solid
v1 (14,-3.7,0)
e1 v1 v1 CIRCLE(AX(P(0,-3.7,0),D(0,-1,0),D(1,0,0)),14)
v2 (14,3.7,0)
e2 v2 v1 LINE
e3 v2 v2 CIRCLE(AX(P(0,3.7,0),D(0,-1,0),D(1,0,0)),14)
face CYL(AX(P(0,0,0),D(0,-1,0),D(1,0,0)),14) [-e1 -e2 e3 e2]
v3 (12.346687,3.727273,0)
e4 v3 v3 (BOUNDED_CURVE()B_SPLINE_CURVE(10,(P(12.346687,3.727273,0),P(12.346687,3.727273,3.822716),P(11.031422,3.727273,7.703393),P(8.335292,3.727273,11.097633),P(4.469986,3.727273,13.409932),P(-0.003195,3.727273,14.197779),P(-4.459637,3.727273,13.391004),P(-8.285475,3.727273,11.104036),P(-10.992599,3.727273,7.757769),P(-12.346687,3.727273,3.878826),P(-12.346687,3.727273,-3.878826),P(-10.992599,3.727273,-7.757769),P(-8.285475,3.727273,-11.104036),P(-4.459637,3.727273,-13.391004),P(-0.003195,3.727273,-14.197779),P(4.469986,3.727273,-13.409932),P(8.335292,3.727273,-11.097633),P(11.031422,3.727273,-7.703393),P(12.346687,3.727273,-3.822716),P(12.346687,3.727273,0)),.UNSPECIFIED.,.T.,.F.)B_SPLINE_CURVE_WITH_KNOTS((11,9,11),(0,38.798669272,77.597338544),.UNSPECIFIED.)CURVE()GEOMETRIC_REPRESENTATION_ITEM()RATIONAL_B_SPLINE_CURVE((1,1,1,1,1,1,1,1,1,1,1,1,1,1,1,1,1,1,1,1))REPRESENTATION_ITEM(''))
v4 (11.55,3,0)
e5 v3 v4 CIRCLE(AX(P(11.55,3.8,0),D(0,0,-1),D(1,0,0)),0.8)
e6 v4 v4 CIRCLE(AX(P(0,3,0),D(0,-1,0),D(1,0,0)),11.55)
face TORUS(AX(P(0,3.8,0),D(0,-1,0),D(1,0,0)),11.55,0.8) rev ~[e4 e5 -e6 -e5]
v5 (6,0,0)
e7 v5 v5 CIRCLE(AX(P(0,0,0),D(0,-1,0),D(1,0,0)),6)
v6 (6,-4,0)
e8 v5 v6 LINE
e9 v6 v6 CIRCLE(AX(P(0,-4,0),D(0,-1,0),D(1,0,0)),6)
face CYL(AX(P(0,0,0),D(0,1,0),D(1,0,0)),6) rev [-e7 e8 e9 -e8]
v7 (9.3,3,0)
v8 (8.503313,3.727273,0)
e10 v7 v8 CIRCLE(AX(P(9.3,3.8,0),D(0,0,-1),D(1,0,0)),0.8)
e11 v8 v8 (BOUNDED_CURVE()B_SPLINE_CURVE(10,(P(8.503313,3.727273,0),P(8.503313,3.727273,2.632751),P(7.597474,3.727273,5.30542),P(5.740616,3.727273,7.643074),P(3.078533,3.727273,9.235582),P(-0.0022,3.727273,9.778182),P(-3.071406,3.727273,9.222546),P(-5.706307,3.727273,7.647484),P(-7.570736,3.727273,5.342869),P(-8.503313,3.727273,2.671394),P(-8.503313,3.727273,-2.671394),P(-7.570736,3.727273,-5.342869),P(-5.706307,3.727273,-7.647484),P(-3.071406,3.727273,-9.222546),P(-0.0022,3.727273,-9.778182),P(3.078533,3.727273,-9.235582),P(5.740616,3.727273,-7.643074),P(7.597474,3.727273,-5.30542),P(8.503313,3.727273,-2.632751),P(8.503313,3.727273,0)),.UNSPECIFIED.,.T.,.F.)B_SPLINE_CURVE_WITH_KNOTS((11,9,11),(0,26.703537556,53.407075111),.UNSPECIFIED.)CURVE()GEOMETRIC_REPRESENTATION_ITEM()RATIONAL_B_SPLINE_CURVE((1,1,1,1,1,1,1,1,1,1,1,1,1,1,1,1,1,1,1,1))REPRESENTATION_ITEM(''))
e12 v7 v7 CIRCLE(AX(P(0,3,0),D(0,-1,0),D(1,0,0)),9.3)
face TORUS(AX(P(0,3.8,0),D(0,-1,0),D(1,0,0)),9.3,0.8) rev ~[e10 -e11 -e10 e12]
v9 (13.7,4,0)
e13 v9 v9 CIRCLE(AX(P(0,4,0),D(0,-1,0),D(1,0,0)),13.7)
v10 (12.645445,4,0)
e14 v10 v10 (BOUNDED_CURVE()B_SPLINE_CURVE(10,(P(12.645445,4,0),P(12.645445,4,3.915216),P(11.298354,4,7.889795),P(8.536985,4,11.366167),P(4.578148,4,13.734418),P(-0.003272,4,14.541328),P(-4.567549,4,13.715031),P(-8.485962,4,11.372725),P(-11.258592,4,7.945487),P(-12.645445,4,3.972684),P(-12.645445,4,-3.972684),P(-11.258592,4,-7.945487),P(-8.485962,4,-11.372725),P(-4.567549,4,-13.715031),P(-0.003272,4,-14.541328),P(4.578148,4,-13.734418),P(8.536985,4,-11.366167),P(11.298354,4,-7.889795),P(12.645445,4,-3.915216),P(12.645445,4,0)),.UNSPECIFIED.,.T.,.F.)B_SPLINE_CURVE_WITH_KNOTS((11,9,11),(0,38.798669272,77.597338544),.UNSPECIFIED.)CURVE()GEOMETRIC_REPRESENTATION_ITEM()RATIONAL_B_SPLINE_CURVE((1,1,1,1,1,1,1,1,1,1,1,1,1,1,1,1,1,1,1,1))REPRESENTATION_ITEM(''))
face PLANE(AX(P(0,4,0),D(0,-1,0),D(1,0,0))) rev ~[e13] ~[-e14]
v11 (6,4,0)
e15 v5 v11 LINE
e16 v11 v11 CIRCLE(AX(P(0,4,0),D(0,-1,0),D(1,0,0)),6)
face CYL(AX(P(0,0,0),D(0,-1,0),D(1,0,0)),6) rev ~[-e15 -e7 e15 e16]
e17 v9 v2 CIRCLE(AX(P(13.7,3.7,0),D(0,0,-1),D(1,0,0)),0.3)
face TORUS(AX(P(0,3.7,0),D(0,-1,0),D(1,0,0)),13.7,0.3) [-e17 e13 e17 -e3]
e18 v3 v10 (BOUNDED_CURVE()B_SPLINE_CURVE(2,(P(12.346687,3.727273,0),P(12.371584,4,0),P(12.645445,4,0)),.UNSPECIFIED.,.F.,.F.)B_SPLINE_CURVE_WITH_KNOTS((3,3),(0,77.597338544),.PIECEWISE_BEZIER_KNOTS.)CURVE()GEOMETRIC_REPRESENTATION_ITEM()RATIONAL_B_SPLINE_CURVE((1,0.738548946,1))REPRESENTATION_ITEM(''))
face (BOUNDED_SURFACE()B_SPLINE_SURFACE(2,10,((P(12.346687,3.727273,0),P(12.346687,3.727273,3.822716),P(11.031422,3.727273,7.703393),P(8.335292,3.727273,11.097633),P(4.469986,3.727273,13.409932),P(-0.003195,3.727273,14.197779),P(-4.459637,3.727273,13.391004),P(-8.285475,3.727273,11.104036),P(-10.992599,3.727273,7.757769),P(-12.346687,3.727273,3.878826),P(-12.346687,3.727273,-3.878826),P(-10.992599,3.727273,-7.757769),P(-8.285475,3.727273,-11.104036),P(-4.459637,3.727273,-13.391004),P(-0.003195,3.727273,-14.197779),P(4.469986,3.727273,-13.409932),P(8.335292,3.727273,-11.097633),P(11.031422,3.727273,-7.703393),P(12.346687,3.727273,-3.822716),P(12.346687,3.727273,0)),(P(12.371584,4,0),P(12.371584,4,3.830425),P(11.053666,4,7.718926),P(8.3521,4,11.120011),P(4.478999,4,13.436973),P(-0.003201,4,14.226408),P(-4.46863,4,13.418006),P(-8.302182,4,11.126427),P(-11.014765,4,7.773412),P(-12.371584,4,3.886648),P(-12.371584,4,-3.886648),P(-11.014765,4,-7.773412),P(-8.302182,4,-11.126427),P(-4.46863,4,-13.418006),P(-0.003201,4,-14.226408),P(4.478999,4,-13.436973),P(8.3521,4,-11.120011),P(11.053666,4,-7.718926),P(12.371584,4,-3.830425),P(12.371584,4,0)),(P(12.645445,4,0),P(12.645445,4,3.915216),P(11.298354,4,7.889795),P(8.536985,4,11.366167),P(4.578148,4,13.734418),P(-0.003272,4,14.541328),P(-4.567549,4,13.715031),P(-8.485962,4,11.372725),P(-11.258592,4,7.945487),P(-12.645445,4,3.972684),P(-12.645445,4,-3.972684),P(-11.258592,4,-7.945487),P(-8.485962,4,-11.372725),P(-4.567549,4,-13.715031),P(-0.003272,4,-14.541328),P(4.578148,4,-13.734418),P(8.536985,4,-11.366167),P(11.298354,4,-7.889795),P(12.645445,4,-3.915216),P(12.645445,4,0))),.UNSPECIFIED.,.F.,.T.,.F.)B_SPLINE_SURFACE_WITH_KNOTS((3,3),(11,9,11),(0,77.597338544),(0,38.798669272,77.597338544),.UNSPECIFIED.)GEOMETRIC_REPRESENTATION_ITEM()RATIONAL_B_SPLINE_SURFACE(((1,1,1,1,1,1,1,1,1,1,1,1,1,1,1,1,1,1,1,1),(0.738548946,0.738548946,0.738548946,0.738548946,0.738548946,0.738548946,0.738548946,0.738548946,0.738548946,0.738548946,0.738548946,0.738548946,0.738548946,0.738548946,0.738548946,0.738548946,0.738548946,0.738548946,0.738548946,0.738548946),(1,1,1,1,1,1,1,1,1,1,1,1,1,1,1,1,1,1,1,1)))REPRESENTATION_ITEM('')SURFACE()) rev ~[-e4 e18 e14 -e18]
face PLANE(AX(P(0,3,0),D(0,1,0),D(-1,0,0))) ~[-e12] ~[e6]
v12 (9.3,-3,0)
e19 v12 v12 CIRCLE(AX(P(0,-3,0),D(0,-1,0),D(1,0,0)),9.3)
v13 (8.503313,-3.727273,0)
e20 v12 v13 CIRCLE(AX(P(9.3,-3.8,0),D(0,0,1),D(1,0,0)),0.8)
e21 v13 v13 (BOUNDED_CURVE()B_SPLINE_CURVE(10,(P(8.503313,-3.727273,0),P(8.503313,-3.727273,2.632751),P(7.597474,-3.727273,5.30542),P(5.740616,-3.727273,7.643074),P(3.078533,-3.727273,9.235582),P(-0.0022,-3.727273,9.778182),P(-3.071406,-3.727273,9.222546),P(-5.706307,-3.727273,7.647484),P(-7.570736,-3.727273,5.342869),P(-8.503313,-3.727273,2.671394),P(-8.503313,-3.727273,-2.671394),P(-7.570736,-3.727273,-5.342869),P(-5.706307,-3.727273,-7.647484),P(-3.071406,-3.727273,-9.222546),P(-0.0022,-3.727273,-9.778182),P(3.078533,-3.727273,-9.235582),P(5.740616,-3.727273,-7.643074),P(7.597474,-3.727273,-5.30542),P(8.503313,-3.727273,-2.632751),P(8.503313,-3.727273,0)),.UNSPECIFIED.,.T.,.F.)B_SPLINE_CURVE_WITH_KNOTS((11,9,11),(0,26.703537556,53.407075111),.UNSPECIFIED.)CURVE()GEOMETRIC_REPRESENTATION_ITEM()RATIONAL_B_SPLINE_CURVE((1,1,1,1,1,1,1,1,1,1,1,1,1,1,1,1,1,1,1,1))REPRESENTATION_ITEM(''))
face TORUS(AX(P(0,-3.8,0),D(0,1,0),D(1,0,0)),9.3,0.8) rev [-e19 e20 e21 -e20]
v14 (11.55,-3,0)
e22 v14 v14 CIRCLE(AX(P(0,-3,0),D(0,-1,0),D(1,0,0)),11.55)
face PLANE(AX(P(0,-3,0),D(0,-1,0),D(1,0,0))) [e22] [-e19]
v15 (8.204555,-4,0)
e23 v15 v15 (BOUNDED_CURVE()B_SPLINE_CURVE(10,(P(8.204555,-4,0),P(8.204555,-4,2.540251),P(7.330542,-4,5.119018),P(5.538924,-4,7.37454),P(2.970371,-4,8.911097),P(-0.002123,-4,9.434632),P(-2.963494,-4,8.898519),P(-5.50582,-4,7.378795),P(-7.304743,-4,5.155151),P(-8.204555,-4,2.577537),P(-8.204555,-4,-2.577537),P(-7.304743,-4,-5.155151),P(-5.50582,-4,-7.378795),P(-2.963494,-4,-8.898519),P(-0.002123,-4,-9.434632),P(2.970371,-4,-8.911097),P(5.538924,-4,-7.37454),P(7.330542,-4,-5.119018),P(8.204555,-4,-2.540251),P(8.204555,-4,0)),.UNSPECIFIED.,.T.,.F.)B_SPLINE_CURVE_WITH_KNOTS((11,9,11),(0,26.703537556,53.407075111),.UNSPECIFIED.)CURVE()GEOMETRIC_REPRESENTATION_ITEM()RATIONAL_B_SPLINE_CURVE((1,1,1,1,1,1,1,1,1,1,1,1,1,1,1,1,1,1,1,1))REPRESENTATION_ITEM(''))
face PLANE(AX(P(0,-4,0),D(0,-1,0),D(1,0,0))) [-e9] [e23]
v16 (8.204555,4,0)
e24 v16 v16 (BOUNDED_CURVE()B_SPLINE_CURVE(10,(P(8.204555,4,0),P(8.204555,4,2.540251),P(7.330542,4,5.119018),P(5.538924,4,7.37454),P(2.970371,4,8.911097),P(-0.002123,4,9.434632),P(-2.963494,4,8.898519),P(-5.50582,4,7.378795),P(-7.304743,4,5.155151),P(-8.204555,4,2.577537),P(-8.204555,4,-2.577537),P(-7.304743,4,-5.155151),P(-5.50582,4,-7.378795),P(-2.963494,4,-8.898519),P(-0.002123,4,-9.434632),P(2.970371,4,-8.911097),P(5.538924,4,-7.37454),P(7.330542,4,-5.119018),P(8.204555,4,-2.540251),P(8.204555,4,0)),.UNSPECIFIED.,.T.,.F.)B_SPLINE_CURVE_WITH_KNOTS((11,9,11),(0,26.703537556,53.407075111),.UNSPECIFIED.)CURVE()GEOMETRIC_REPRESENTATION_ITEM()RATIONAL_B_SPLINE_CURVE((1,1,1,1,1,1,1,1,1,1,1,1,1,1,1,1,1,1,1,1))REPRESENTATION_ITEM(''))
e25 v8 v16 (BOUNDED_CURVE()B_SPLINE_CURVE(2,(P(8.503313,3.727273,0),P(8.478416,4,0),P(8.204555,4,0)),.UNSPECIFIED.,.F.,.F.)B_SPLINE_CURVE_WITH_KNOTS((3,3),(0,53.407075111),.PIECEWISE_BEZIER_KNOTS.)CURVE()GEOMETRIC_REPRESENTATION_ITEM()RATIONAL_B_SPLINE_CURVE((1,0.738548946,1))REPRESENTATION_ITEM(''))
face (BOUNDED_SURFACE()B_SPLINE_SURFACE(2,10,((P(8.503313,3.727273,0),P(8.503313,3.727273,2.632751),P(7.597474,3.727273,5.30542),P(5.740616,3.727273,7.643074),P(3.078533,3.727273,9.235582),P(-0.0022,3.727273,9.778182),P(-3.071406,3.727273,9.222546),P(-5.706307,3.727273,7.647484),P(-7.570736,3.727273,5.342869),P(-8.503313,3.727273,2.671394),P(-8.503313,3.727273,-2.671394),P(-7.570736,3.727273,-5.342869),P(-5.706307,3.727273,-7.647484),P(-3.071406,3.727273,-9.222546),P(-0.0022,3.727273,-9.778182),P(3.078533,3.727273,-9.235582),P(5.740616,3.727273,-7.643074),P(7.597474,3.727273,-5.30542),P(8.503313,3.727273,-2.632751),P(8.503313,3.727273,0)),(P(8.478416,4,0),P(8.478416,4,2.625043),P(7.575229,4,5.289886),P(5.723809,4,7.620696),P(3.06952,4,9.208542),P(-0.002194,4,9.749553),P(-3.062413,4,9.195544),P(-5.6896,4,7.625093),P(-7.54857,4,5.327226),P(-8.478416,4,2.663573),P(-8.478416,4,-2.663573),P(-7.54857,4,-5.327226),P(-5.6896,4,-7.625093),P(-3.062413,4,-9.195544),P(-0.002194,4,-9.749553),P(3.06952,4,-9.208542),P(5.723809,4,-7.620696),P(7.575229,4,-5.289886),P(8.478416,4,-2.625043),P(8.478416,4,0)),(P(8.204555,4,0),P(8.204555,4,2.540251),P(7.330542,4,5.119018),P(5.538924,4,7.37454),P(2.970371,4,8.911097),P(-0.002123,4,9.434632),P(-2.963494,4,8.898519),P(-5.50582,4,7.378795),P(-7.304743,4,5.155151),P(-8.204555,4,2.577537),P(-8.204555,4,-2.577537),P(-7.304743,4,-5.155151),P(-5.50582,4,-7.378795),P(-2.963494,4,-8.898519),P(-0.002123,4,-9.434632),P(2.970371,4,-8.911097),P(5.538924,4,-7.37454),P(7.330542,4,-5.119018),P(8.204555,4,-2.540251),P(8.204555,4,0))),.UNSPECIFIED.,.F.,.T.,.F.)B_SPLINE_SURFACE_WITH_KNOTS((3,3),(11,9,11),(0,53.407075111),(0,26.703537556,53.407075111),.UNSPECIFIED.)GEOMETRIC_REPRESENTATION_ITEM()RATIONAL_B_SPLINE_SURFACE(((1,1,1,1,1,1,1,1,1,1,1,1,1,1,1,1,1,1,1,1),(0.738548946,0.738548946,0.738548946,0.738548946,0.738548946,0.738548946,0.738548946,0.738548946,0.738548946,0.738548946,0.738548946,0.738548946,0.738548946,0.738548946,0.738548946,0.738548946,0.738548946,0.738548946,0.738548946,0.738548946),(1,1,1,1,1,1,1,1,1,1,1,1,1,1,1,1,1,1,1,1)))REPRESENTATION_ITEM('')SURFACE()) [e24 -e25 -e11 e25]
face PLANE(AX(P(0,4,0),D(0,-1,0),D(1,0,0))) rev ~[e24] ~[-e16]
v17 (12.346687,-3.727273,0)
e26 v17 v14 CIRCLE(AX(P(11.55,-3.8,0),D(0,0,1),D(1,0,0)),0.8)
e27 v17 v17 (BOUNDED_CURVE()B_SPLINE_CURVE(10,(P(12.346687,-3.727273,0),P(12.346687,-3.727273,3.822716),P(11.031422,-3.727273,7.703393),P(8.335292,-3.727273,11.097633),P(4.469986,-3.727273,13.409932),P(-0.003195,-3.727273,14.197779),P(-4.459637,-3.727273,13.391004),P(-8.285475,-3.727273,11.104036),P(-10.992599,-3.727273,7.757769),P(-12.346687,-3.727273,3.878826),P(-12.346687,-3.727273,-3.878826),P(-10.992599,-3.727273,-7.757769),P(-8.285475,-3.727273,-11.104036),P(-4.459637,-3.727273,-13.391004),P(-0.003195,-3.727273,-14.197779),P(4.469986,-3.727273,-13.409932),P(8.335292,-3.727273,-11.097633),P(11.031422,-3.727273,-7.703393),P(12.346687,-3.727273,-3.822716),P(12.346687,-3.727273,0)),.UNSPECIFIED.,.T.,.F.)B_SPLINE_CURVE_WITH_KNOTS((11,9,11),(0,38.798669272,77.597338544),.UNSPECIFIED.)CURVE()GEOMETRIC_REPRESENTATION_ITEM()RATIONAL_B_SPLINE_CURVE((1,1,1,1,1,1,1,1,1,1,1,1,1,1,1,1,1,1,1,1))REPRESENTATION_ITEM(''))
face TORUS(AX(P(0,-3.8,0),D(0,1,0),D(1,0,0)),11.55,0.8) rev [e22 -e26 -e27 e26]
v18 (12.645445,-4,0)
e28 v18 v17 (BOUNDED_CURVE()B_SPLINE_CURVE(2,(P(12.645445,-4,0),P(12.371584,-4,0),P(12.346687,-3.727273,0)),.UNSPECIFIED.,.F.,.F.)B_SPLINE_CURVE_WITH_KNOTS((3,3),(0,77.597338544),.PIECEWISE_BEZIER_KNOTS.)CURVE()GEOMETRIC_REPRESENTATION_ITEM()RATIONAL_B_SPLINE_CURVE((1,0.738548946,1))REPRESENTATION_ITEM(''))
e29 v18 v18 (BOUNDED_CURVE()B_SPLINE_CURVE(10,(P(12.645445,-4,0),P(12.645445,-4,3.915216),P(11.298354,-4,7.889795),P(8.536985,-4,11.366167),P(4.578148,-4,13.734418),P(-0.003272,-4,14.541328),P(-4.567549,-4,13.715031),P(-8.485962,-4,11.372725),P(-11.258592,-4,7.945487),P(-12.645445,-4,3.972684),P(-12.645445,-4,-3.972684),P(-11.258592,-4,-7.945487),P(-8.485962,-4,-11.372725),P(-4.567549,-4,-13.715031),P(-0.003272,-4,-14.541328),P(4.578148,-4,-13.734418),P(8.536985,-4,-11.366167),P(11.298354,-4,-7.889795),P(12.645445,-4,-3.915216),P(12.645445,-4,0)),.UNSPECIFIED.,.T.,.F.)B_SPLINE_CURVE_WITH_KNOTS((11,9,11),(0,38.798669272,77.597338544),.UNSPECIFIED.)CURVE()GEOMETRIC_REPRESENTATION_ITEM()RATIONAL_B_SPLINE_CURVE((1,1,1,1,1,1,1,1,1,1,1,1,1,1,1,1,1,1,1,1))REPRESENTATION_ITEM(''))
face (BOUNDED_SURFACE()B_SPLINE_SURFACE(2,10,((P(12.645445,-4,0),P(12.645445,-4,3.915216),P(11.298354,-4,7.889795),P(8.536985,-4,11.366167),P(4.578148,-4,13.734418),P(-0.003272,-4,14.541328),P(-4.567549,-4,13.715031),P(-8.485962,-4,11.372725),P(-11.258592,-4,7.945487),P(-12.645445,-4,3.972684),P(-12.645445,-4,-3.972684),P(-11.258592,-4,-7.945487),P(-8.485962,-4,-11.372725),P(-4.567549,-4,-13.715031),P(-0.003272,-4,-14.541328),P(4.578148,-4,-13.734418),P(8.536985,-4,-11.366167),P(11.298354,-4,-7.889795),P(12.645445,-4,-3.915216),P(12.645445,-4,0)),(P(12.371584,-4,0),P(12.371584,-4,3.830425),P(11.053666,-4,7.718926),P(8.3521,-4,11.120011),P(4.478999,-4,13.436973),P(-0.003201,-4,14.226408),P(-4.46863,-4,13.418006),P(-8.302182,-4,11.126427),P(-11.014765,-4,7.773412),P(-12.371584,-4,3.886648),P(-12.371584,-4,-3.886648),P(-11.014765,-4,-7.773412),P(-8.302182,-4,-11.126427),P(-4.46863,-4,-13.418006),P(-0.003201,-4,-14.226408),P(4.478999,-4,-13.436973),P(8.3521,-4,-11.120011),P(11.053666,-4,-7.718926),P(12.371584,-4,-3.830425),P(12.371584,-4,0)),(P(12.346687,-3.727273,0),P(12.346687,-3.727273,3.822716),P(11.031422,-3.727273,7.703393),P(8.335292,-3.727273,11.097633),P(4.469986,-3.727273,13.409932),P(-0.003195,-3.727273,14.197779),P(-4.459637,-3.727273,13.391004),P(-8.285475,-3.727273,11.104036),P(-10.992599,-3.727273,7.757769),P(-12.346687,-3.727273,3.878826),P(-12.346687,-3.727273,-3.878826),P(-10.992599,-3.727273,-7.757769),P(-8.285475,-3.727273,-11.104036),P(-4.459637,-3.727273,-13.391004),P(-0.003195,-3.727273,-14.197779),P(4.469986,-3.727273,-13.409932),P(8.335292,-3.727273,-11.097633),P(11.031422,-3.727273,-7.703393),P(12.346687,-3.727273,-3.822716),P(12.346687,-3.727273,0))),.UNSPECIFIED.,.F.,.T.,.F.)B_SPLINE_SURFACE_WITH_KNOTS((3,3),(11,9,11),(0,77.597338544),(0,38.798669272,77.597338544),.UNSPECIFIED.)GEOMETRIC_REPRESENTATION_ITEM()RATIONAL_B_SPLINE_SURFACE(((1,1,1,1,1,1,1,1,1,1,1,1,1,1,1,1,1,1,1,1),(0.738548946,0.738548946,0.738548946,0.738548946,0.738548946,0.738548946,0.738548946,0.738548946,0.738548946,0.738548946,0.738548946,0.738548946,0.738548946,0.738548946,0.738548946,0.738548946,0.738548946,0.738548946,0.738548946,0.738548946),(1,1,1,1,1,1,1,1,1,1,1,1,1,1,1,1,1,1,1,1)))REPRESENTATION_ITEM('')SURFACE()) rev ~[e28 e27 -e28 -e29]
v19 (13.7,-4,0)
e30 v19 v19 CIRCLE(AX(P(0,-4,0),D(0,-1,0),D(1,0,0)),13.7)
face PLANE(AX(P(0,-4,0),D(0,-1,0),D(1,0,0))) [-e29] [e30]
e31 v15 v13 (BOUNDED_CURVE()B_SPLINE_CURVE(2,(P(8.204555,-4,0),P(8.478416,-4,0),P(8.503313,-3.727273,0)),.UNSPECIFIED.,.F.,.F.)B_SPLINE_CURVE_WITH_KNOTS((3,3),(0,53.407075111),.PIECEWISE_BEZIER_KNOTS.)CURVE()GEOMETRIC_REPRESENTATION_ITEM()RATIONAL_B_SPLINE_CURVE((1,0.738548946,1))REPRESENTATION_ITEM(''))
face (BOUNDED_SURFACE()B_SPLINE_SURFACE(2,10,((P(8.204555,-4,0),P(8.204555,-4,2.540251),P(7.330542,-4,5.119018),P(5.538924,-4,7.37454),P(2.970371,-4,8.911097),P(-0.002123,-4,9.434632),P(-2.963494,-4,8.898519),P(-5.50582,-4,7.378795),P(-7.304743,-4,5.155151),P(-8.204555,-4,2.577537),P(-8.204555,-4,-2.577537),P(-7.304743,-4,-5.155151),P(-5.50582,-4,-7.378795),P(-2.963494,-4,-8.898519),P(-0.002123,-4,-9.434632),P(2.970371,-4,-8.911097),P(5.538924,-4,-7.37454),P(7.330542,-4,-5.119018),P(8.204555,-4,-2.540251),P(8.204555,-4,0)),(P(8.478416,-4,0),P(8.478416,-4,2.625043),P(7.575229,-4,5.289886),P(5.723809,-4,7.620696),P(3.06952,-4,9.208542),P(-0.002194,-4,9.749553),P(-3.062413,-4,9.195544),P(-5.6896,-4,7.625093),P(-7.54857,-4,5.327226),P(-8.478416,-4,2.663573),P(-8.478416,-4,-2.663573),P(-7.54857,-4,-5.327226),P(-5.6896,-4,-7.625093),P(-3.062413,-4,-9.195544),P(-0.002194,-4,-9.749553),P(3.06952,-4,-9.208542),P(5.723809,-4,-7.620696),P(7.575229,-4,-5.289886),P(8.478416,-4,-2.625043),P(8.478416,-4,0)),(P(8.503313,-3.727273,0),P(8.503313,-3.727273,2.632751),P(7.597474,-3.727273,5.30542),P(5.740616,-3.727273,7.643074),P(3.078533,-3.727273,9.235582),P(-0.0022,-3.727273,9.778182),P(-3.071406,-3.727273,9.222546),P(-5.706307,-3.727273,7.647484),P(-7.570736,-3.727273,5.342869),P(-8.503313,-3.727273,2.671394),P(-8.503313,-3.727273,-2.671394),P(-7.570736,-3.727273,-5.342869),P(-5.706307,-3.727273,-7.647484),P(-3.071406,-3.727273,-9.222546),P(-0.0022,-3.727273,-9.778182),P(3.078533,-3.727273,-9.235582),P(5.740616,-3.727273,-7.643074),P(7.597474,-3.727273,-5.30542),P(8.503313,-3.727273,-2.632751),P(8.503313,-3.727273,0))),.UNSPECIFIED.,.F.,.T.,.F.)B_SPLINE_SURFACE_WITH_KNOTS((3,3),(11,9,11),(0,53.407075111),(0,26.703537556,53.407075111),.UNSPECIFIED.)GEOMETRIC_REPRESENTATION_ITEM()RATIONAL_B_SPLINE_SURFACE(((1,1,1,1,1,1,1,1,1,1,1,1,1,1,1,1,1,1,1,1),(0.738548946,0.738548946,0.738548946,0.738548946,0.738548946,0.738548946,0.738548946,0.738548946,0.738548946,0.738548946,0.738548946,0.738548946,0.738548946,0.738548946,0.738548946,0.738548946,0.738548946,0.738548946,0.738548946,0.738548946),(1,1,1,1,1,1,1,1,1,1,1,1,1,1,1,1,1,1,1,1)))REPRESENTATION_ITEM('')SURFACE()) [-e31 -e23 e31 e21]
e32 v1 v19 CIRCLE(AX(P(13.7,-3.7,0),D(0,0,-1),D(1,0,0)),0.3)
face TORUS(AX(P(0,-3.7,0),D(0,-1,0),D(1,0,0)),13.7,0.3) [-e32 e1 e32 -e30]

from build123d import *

# Parameters (mm, degrees)
F0_R          = 14
F0_R_2        = 6
F1_DEPTH      = 4
F1_DEPTH_BACK = 4
F2_R          = 12.35
F2_R_2        = 8.5
F3_DEPTH      = 1
F4_R          = 0.8
F5_R          = 0.3


# Not quite as in the source:
# - a pattern or mirror of a feature is missing from the dataset's text; its kind, count and spacing are read off the source's solid


with BuildPart() as f1:
    # F0 (on Front) → F1 (new body, two sides)
    with BuildSketch(Plane.XZ) as f1_sk:
        Circle(F0_R)
        Circle(F0_R_2, mode=Mode.SUBTRACT)
    extrude(amount=F1_DEPTH)
    extrude(f1_sk.sketch, amount=-F1_DEPTH_BACK)

    # F2 (on face) → F3 (cut)
    with BuildSketch(Plane.XZ.offset(4)):
        Circle(F2_R)
        Circle(F2_R_2, mode=Mode.SUBTRACT)
    f3 = extrude(amount=-F3_DEPTH, mode=Mode.SUBTRACT)

    # F3_copies: F3 across plane
    add(f3.mirror(Plane.ZX), mode=Mode.SUBTRACT)

    # F4
    f4_edges = [f1.edges().sort_by_distance(p)[0] for p in [
        (-8.5, -3, 0),
        (-12.35, -3, 0),
        (-12.35, 3, 0),
        (-8.5, 3, 0),
    ]]
    fillet(f4_edges, radius=F4_R)

    # F5
    f5_edges = [f1.edges().sort_by_distance(p)[0] for p in [
        (-12.35, -4, 0),
        (-14, -4, 0),
        (-8.5, -4, 0),
        (-14, 4, 0),
        (-12.35, 4, 0),
        (-8.5, 4, 0),
    ]]
    fillet(f5_edges, radius=F5_R)


solid = f1.part
